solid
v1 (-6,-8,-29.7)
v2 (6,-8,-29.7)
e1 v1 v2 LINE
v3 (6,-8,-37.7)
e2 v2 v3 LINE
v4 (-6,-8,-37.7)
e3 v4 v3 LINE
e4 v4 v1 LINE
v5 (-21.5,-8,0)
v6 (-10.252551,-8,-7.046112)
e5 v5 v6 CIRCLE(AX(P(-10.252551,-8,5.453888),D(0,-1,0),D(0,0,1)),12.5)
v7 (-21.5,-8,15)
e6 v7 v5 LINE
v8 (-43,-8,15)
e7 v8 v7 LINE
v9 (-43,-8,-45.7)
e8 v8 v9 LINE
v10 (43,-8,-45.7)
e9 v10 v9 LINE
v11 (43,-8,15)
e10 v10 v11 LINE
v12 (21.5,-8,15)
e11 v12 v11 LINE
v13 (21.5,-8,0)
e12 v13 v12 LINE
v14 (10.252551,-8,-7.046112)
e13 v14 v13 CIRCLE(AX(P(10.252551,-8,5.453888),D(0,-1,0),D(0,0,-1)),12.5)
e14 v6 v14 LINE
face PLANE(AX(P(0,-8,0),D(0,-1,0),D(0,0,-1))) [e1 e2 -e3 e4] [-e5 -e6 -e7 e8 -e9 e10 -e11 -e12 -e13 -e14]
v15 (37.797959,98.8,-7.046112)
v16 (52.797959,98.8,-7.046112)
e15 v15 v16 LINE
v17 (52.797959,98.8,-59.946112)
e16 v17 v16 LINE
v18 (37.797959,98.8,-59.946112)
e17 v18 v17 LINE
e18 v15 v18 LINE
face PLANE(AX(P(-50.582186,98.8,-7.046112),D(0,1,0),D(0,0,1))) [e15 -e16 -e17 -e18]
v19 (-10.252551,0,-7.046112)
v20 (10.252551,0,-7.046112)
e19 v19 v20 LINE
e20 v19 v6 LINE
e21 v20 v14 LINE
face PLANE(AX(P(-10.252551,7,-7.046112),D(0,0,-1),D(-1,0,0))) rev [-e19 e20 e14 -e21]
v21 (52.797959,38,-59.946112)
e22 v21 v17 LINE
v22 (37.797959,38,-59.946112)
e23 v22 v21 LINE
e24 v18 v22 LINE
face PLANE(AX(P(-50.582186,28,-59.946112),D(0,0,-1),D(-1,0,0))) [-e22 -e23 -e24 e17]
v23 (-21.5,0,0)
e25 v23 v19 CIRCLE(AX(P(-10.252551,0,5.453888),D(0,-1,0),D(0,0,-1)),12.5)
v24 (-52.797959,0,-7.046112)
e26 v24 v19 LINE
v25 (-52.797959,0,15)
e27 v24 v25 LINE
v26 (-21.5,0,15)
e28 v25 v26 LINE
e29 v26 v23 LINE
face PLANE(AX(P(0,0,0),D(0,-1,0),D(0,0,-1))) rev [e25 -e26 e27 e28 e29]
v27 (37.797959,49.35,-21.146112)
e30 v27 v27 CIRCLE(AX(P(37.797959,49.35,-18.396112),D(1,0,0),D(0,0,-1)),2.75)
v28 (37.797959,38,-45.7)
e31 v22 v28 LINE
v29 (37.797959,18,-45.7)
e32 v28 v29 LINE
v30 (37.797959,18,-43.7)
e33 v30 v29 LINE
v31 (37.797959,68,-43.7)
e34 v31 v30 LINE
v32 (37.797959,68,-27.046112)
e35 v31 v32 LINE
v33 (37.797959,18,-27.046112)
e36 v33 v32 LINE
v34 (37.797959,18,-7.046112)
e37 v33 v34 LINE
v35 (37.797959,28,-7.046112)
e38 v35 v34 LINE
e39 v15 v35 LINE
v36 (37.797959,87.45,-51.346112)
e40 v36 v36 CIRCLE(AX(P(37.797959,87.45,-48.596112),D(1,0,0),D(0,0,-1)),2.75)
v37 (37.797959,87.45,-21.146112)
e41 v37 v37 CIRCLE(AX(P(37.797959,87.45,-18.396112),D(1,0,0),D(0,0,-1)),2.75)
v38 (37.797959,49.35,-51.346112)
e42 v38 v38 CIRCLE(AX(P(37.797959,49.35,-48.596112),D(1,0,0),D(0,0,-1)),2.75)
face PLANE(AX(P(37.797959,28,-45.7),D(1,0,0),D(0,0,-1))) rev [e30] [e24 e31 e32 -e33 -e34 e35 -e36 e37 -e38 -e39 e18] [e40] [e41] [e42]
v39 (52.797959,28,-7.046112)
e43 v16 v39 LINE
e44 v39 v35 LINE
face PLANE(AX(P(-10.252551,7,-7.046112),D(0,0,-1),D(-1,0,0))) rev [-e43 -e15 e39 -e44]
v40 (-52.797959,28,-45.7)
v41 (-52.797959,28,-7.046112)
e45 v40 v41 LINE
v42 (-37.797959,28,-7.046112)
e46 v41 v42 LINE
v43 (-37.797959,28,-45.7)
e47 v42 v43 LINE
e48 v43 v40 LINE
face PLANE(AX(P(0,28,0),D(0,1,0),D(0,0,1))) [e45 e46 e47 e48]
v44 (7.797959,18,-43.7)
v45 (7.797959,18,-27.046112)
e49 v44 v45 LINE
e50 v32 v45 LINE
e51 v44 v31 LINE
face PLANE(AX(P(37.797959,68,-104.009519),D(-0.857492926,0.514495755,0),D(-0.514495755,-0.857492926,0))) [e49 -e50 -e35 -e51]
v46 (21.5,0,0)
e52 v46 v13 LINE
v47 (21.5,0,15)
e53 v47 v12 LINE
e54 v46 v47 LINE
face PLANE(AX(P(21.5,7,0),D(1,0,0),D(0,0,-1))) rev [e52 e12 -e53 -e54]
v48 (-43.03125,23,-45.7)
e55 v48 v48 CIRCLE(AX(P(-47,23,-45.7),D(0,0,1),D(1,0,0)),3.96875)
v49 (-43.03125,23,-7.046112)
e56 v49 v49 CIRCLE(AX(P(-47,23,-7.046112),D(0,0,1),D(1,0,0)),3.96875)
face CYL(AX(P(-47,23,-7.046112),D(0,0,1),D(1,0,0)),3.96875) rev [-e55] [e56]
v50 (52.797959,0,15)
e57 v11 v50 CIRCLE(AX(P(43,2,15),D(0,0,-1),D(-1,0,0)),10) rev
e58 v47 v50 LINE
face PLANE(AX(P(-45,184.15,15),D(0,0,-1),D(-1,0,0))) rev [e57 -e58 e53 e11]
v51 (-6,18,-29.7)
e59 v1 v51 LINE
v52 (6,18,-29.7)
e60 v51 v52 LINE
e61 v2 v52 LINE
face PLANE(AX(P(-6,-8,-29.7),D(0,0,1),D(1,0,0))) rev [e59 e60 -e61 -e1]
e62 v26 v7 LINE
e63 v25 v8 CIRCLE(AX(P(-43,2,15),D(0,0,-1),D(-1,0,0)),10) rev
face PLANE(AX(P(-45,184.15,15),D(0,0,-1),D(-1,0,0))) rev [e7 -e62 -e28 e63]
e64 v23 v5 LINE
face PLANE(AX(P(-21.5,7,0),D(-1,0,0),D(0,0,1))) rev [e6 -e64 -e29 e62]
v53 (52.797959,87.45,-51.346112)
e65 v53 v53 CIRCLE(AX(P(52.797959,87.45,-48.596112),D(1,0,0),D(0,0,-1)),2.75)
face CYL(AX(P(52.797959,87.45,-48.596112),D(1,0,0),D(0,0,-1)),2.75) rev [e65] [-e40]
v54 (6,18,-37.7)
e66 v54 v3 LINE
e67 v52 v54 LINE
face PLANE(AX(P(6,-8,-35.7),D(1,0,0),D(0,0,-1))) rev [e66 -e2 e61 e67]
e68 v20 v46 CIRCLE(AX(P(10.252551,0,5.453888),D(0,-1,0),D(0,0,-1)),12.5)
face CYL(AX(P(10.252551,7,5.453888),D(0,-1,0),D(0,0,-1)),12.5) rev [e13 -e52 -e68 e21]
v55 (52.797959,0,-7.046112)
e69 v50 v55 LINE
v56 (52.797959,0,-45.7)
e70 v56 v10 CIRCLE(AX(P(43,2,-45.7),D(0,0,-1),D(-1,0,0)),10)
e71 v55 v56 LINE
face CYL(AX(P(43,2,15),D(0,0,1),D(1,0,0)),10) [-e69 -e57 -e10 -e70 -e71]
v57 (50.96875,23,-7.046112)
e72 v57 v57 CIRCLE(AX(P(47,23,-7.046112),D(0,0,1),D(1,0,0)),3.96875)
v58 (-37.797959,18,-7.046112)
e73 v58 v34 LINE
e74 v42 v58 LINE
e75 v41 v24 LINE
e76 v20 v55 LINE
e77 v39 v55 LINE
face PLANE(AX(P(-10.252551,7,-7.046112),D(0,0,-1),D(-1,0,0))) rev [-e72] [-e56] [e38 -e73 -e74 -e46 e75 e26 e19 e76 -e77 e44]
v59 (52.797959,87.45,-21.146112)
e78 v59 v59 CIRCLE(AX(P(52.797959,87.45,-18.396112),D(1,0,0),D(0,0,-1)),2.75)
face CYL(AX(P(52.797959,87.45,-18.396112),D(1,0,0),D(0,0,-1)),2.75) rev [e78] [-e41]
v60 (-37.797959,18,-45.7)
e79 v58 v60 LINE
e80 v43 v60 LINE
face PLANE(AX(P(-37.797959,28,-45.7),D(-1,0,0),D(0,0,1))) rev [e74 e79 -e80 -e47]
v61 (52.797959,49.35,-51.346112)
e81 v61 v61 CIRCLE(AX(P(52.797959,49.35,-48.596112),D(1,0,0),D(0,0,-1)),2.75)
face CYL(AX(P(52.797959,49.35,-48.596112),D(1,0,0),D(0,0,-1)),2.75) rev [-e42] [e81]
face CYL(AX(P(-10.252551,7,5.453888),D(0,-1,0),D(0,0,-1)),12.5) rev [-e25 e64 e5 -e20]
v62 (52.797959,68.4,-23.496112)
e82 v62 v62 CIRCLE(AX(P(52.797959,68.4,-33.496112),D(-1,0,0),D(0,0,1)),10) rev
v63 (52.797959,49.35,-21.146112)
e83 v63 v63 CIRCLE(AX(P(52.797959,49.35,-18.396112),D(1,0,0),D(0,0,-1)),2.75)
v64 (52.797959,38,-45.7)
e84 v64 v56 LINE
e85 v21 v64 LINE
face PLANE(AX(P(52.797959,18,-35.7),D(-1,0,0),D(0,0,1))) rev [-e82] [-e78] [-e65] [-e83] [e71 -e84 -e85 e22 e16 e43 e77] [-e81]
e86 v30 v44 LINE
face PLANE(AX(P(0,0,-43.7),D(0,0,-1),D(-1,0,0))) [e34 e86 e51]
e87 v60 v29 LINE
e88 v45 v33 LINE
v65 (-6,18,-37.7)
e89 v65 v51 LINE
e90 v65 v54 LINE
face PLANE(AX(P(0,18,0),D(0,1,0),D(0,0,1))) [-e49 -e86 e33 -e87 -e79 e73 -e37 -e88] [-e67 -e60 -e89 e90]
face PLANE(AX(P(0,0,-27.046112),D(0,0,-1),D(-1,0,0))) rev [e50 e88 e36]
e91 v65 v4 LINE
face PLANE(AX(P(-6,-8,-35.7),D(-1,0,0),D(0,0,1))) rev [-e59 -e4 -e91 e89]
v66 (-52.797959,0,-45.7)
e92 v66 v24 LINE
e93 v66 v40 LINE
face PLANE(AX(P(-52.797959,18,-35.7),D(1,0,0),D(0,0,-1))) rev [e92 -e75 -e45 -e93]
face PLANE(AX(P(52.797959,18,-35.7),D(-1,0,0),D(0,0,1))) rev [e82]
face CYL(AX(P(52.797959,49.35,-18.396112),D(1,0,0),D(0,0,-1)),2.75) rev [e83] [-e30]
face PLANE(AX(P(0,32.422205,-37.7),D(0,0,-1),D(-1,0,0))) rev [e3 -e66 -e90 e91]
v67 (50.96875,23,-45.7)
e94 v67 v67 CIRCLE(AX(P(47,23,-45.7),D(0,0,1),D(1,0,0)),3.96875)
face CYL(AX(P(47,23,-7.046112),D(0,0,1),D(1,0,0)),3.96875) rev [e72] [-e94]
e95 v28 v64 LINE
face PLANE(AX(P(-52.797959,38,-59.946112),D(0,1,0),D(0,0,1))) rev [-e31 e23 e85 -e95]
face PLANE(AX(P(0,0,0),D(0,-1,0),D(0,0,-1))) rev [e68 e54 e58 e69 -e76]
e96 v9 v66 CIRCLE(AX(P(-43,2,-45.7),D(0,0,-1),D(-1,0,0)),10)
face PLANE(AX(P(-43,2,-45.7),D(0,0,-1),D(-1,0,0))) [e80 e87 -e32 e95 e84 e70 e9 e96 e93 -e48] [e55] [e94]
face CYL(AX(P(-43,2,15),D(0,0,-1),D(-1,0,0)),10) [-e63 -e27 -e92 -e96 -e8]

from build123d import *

# Parameters (mm, degrees)
SKETCH2_W                      = 90
SKETCH2_H                      = 30
BOSS_EXTRUDE1_DEPTH            = 184.15
SHELL1_T                       = 8
FILLET1_R                      = 10
CUT_EXTRUDE1_DEPTH             = 15
BOSS_EXTRUDE3_DEPTH            = 12.7
SKETCH19_W                     = 50.7
SKETCH19_H                     = 190.15
CUT_EXTRUDE3_DEPTH             = 160
CUT_EXTRUDE4_DEPTH             = 62.424750712
CUT_EXTRUDE5_DEPTH             = 83.99843372
CUT_EXTRUDE5_DEPTH_BACK        = 83.99843372
SKETCH21_W                     = 50.7
SKETCH21_H                     = 2
SKETCH22_W                     = 105.595917942
SKETCH22_H                     = 28.653888285
BOSS_EXTRUDE4_DEPTH            = 18
SKETCH25_W                     = 12
SKETCH25_H                     = 6
CUT_EXTRUDE7_DEPTH             = 69.833963067
BOSS_EXTRUDE6_DEPTH            = 10
SKETCH27_W                     = 12
SKETCH27_H                     = 8
BOSS_EXTRUDE7_DEPTH            = 26
SKETCH31_W                     = 15
SKETCH31_H                     = 38.653888285
BOSS_EXTRUDE8_DEPTH            = 10
F_5_16_0_3125_DIAMETER_HOLE2_D = 7.9375
SKETCH35_W                     = 52.9
SKETCH35_H                     = 70.8
BOSS_EXTRUDE9_DEPTH            = 15
F_5_5_5_5_DIAMETER_HOLE1_D     = 5.5
BOSS_EXTRUDE10_DEPTH           = 38.653888285
CUT_EXTRUDE8_DEPTH             = 20
CUT_EXTRUDE10_DEPTH            = 2
SKETCH43_W                     = 14.246111715
SKETCH43_H                     = 10
CUT_EXTRUDE11_DEPTH            = 157.542244125


with BuildPart() as part:
    # Sketch2 → Boss-Extrude1 (new body)
    with BuildSketch(Plane(origin=(0, 0, 0), x_dir=(1, 0, 0), z_dir=(0, 1, 0))):
        Rectangle(SKETCH2_W, SKETCH2_H)
    extrude(amount=BOSS_EXTRUDE1_DEPTH)

    # Shell1
    shell1_openings = [part.faces().sort_by_distance(p)[0] for p in [
        (0, 92.075, 15),
    ]]
    offset(amount=SHELL1_T, openings=shell1_openings, kind=Kind.INTERSECTION)

    # Fillet1
    # the kernel refuses this fillet: 10 mm, written as the material it adds along each edge
    with BuildSketch(Plane(origin=(-45, 0, -15), x_dir=(0, 1, 0), z_dir=(0, 0, 1)), Plane(origin=(45, 0, 15), x_dir=(0, 1, 0), z_dir=(0, 0, -1))) as fillet1_piece_1:
        with BuildLine():
            CenterArc((FILLET1_R, -FILLET1_R), FILLET1_R, 90, 90)
            Line((0, -FILLET1_R), (0, 0))
            Line((0, 0), (FILLET1_R, 0))
        make_face()
    extrude(amount=30)
    with BuildSketch(Plane(origin=(-45, 184.15, -15), x_dir=(0, -1, 0), z_dir=(0, 0, 1)), Plane(origin=(45, 184.15, 15), x_dir=(0, -1, 0), z_dir=(0, 0, -1))) as fillet1_piece_2:
        with BuildLine():
            CenterArc((FILLET1_R, FILLET1_R), FILLET1_R, 180, 90)
            Line((0, FILLET1_R), (0, 0))
            Line((0, 0), (FILLET1_R, 0))
        make_face()
    extrude(amount=30)
    # the kernel refuses this fillet: 10 mm, written as the material it takes off along each edge
    with BuildSketch(Plane(origin=(53, 192.15, 40), x_dir=(0, -1, 0), z_dir=(0, 0, -1)), Plane(origin=(-53, 192.15, -48), x_dir=(0, -1, 0), z_dir=(0, 0, 1)), Plane(origin=(-53, -8, -48), x_dir=(1, 0, 0), z_dir=(0, 0, 1))) as fillet1_2_piece_1:
        with BuildLine():
            CenterArc((FILLET1_R, FILLET1_R), FILLET1_R, 180, 90)
            Line((0, FILLET1_R), (0, 0))
            Line((0, 0), (FILLET1_R, 0))
        make_face()
    extrude(amount=88, mode=Mode.SUBTRACT)
    with BuildSketch(Plane(origin=(53, -8, 40), x_dir=(0, 1, 0), z_dir=(0, 0, -1))) as fillet1_2_piece_2:
        with BuildLine():
            CenterArc((FILLET1_R, -FILLET1_R), FILLET1_R, 90, 90)
            Line((0, -FILLET1_R), (0, 0))
            Line((0, 0), (FILLET1_R, 0))
        make_face()
    extrude(amount=88, mode=Mode.SUBTRACT)

    # Sketch3 → Cut-Extrude1 (cut)
    with BuildSketch(Plane.XZ.offset(8)):
        with BuildLine():
            Line((-21.5, 15), (21.5, 15))
            Line((21.5, 15), (21.5, 0))
            ThreePointArc((21.5, 0), (16.888679541, -5.139118926), (10.252551286, -7.046111715))
            Line((10.252551286, -7.046111715), (-10.252551286, -7.046111715))
            ThreePointArc((-10.252551286, -7.046111715), (-16.888679541, -5.139118926), (-21.5, 0))
            Line((-21.5, 0), (-21.5, 15))
        make_face()
    extrude(amount=-CUT_EXTRUDE1_DEPTH, mode=Mode.SUBTRACT)

    # Sketch16 → Boss-Extrude3 (add)
    with BuildSketch(Plane(origin=(0, 0, -23), x_dir=(-1, 0, 0), z_dir=(0, 0, -1))):
        with BuildLine():
            Line((-53, 182.15), (-53, 2))
            ThreePointArc((-53, 2), (-50.071067812, -5.071067812), (-43, -8))
            Line((-43, -8), (43, -8))
            ThreePointArc((43, -8), (50.071067812, -5.071067812), (53, 2))
            Line((53, 2), (53, 182.15))
            ThreePointArc((53, 182.15), (50.071067812, 189.221067812), (43, 192.15))
            Line((43, 192.15), (-43, 192.15))
            ThreePointArc((-43, 192.15), (-50.071067812, 189.221067812), (-53, 182.15))
        make_face()
    extrude(amount=BOSS_EXTRUDE3_DEPTH)

    # Sketch19 → Cut-Extrude3 (cut)
    with BuildSketch(Plane(origin=(53, 0, 0), x_dir=(0, 0, -1), z_dir=(1, 0, 0))):
        with Locations((10.35, 97.075)):
            Rectangle(SKETCH19_W, SKETCH19_H)
    extrude(amount=-CUT_EXTRUDE3_DEPTH, mode=Mode.SUBTRACT)

    # Sketch20 → Cut-Extrude4 (cut, through all)
    with BuildSketch(Plane.XY.offset(-15)):
        with BuildLine():
            Line((41, 2), (-41, 2))
            ThreePointArc((-41, 2), (-38.16227766, 0.513167019), (-35, 0))
            Line((-35, 0), (35, 0))
            ThreePointArc((35, 0), (38.16227766, 0.513167019), (41, 2))
        make_face()
    extrude(amount=-CUT_EXTRUDE4_DEPTH, mode=Mode.SUBTRACT)

    # Sketch21 → Cut-Extrude5 (cut, two sides: drawn at the far end of the back side and taken through both)
    with BuildSketch(Plane.ZY.offset(-21.5).offset(-CUT_EXTRUDE5_DEPTH_BACK)):
        with Locations((-10.35, 1)):
            Rectangle(SKETCH21_W, SKETCH21_H)
    extrude(amount=CUT_EXTRUDE5_DEPTH + CUT_EXTRUDE5_DEPTH_BACK, mode=Mode.SUBTRACT)

    # Sketch22 → Boss-Extrude4 (add)
    with BuildSketch(Plane(origin=(0, 0, 0), x_dir=(1, 0, 0), z_dir=(0, 1, 0))):
        with Locations((0, 21.373055858)):
            Rectangle(SKETCH22_W, SKETCH22_H)
    extrude(amount=BOSS_EXTRUDE4_DEPTH)

    # Sketch25 → Cut-Extrude7 (cut, through all)
    with BuildSketch(Plane(origin=(0, 18, 0), x_dir=(1, 0, 0), z_dir=(0, 1, 0))):
        with Locations((0, 32.7)):
            Rectangle(SKETCH25_W, SKETCH25_H)
    extrude(amount=-CUT_EXTRUDE7_DEPTH, mode=Mode.SUBTRACT)

    # Sketch26 → Boss-Extrude6 (add)
    with BuildSketch(Plane(origin=(0, 0, -35.7), x_dir=(-1, 0, 0), z_dir=(0, 0, -1))):
        with BuildLine():
            Line((6, 18), (6, -8))
            Line((6, -8), (43, -8))
            ThreePointArc((43, -8), (49.32455532, -5.745966692), (52.797958971, 0))
            Line((52.797958971, 0), (52.797958971, 18))
            Line((52.797958971, 18), (6, 18))
        make_face()
        with BuildLine():
            Line((-6, -8), (-6, 18))
            Line((-6, 18), (-52.797958971, 18))
            Line((-52.797958971, 18), (-52.797958971, 0))
            ThreePointArc((-52.797958971, 0), (-49.32455532, -5.745966692), (-43, -8))
            Line((-43, -8), (-6, -8))
        make_face()
    extrude(amount=BOSS_EXTRUDE6_DEPTH)

    # Sketch27 → Boss-Extrude7 (add)
    with BuildSketch(Plane.XZ.offset(8)):
        with Locations((0, -41.7)):
            Rectangle(SKETCH27_W, SKETCH27_H)
    extrude(amount=-BOSS_EXTRUDE7_DEPTH)

    # Sketch31 → Boss-Extrude8 (add)
    with BuildSketch(Plane(origin=(0, 18, 0), x_dir=(1, 0, 0), z_dir=(0, 1, 0))):
        with Locations((-45.297958971, 26.373055858)):
            Rectangle(SKETCH31_W, SKETCH31_H)
        with Locations((45.297958971, 26.373055858)):
            Rectangle(SKETCH31_W, SKETCH31_H)
    extrude(amount=BOSS_EXTRUDE8_DEPTH)

    # 5/16 (0.3125) Diameter Hole2 (through all)
    with Locations(Plane.XY.offset(-7.046111715)):
        with Locations((-47, 23), (47, 23)):
            Hole(F_5_16_0_3125_DIAMETER_HOLE2_D / 2)

    # Sketch35 → Boss-Extrude9 (add)
    with BuildSketch(Plane(origin=(52.797958971, 0, 0), x_dir=(0, 0, -1), z_dir=(1, 0, 0))):
        with Locations((33.496111715, 63.4)):
            Rectangle(SKETCH35_W, SKETCH35_H)
    extrude(amount=-BOSS_EXTRUDE9_DEPTH)

    # Ø5.5 (5.5) Diameter Hole1 (through all)
    with Locations(Plane(origin=(52.797958971, 0, 0), x_dir=(0, 0, -1), z_dir=(1, 0, 0))):
        with Locations((48.596111715, 87.45), (18.396111715, 87.45), (18.396111715, 49.35), (48.596111715, 49.35)):
            Hole(F_5_5_5_5_DIAMETER_HOLE1_D / 2)

    # Sketch39 → Boss-Extrude10 (add)
    with BuildSketch(Plane.XY.offset(-7.046111715)):
        Polygon((7.797958971, 18), (37.797958971, 18), (37.797958971, 68), align=None)
    extrude(amount=-BOSS_EXTRUDE10_DEPTH)

    # Sketch40 → Cut-Extrude8 (cut)
    with BuildSketch(Plane.XY.offset(-7.046111715)):
        Polygon((37.797958971, 68), (7.797958971, 18), (37.797958971, 18), align=None)
    extrude(amount=-CUT_EXTRUDE8_DEPTH, mode=Mode.SUBTRACT)

    # Sketch42 → Cut-Extrude10 (cut)
    with BuildSketch(Plane(origin=(0, 0, -45.7), x_dir=(-1, 0, 0), z_dir=(0, 0, -1))):
        Polygon((-37.797958971, 68), (-7.797958971, 18), (-37.797958971, 18), align=None)
    extrude(amount=-CUT_EXTRUDE10_DEPTH, mode=Mode.SUBTRACT)

    # Sketch43 → Cut-Extrude11 (cut, through all)
    with BuildSketch(Plane(origin=(52.797958971, 0, 0), x_dir=(0, 0, -1), z_dir=(1, 0, 0))):
        with Locations((52.823055858, 33)):
            Rectangle(SKETCH43_W, SKETCH43_H)
    extrude(amount=-CUT_EXTRUDE11_DEPTH, mode=Mode.SUBTRACT)


solid = part.part
